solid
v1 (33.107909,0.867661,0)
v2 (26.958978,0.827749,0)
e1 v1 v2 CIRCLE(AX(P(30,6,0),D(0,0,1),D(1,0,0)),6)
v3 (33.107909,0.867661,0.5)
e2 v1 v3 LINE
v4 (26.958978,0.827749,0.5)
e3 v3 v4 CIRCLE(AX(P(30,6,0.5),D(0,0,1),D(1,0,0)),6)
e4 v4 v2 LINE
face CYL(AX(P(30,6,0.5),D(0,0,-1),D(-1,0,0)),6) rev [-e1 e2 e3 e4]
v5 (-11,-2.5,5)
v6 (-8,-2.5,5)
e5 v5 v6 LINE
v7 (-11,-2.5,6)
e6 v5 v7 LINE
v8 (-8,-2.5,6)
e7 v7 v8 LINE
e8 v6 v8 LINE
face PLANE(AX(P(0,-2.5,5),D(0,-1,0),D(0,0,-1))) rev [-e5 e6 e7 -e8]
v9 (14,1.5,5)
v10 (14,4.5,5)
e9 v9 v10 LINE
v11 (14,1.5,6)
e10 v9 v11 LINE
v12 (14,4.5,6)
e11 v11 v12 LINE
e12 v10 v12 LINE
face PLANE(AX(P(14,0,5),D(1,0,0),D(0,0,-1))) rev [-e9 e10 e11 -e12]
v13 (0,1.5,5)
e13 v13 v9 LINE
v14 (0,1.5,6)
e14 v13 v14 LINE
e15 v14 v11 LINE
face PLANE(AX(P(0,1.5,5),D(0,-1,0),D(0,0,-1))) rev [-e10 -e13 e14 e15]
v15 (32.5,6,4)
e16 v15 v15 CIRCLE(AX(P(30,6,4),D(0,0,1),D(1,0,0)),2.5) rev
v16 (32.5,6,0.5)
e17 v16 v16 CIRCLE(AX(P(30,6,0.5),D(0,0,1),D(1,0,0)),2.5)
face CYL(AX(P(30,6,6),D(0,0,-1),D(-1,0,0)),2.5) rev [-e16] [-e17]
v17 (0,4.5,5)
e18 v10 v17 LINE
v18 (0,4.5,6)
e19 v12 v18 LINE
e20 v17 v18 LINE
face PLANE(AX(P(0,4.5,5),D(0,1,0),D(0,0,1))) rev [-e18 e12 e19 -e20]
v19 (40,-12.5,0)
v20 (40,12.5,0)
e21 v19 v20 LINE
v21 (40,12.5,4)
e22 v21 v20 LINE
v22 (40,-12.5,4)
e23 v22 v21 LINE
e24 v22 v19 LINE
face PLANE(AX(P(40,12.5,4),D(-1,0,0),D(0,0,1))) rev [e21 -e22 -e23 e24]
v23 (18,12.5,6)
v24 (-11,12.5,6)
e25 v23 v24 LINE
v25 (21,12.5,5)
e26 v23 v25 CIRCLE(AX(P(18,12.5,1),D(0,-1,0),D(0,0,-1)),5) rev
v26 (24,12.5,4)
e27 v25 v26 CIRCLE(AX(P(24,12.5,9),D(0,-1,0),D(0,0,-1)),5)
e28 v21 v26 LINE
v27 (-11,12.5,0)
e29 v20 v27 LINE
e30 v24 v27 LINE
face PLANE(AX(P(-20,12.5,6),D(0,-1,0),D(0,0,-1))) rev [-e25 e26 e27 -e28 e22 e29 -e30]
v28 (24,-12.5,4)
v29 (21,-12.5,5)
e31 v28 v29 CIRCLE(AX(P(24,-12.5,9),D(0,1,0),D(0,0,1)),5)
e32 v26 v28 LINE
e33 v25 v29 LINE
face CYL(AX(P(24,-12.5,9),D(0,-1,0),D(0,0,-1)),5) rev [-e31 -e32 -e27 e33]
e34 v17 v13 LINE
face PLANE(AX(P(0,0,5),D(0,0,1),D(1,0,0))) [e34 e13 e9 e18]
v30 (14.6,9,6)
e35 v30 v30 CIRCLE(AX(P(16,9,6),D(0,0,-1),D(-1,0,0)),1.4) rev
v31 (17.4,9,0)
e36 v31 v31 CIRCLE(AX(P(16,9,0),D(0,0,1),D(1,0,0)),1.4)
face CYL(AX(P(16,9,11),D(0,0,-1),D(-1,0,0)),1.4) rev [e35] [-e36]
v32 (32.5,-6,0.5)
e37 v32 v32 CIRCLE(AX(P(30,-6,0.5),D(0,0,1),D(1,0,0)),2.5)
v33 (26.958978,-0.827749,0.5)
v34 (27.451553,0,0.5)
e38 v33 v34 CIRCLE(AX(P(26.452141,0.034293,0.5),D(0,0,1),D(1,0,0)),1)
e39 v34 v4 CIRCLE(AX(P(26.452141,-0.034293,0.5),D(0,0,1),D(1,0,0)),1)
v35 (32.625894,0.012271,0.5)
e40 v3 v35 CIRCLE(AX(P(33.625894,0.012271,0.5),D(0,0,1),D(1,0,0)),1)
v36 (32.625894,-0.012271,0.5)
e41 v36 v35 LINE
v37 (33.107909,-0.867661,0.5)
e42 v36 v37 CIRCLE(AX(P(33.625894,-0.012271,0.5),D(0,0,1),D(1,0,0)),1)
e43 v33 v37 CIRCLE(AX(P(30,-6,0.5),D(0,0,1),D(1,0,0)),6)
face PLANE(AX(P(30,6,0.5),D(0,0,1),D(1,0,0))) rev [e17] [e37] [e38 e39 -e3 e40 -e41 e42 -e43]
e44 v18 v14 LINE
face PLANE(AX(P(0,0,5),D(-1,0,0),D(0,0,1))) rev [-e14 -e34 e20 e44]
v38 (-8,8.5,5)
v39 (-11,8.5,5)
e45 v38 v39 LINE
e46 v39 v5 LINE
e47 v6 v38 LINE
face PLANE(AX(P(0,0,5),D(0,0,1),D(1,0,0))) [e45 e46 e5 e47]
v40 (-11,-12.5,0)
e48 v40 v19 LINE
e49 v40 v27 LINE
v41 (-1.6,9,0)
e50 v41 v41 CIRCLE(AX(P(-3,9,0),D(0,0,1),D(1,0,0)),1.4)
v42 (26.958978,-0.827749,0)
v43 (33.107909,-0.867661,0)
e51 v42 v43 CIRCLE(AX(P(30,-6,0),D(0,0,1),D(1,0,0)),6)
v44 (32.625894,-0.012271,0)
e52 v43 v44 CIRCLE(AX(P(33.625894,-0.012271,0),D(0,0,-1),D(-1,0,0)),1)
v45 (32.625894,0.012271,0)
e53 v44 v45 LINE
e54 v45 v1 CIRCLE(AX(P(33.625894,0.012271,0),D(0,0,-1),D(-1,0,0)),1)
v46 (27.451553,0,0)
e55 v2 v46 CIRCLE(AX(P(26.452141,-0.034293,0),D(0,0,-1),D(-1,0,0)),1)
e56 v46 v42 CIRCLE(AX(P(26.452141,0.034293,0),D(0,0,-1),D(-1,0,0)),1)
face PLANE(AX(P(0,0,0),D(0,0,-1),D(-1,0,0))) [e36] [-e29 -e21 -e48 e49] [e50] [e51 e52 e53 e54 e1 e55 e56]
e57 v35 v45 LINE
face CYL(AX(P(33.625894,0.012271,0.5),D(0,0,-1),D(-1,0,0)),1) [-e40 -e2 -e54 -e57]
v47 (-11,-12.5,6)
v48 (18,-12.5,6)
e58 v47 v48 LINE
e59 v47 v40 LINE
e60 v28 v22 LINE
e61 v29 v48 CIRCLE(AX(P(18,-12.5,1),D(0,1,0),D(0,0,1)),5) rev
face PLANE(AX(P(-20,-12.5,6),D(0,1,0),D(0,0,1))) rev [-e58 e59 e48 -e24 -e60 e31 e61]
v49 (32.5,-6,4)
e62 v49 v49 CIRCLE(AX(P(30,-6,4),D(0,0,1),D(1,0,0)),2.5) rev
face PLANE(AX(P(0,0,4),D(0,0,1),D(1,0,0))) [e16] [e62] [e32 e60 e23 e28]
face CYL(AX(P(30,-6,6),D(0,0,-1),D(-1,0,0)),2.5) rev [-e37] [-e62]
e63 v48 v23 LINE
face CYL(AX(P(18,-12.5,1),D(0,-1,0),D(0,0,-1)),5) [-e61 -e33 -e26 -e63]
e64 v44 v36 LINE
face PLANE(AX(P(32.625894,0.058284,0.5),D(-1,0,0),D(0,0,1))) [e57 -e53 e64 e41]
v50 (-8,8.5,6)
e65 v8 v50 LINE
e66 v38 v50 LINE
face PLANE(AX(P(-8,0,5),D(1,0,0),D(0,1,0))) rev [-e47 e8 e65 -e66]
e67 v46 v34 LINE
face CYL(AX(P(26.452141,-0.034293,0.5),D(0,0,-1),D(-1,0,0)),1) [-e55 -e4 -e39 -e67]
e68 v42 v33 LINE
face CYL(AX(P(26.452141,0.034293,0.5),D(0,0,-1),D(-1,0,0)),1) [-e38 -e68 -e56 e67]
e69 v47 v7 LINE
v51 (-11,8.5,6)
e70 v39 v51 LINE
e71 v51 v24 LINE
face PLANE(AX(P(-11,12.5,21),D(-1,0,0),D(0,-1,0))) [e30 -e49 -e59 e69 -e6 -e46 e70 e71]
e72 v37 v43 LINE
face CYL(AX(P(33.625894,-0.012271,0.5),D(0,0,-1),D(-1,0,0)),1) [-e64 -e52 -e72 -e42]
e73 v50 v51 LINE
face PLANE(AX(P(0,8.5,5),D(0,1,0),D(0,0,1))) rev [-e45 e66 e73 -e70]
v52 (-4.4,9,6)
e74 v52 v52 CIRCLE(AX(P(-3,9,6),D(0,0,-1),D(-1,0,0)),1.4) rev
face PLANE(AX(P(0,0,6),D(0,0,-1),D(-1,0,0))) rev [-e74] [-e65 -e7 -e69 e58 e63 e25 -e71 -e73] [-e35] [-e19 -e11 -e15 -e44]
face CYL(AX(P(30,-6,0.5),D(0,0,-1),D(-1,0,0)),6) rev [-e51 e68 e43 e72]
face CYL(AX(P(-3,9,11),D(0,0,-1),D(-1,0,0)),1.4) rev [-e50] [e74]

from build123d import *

# Parameters (mm, degrees)
SKETCH1_W           = 40
SKETCH1_H           = 25
BOSS_EXTRUDE1_DEPTH = 6
CUT_EXTRUDE1_START  = 6
SKETCH3_W           = 14
SKETCH3_H           = 3
SKETCH3_W_2         = 3
SKETCH3_H_2         = 11
CUT_EXTRUDE1_DEPTH  = 1
SKETCH4_R           = 1.4
CUT_EXTRUDE2_DEPTH  = 11
SKETCH7_W           = 9
SKETCH7_H           = 25
CUT_EXTRUDE5_DEPTH  = 21
SKETCH8_W           = 20
SKETCH8_H           = 25
BOSS_EXTRUDE2_DEPTH = 4
SKETCH9_R           = 2.5
CUT_EXTRUDE6_DEPTH  = 43.334973721
CUT_EXTRUDE7_DEPTH  = 0.5
FILLET3_R           = 1
FILLET4_R           = 5
FILLET5_R           = 5


with BuildPart() as part:
    # Sketch1 → Boss-Extrude1 (new body)
    with BuildSketch(Plane.XY):
        Rectangle(SKETCH1_W, SKETCH1_H)
    extrude(amount=BOSS_EXTRUDE1_DEPTH)

    # Sketch3 → Cut-Extrude1 (cut)
    with BuildSketch(Plane.XY.offset(CUT_EXTRUDE1_START)):
        with Locations((7, 3)):
            Rectangle(SKETCH3_W, SKETCH3_H)
        with Locations((-9.5, 3)):
            Rectangle(SKETCH3_W_2, SKETCH3_H_2)
    extrude(amount=-CUT_EXTRUDE1_DEPTH, mode=Mode.SUBTRACT)

    # Sketch4 → Cut-Extrude2 (cut)
    with BuildSketch(Plane.XY):
        with Locations(Location((16, 9, 0), (0, 0, 180))):
            Circle(SKETCH4_R)
        with Locations(Location((-3, 9, 0), (0, 0, 180))):
            Circle(SKETCH4_R)
    extrude(amount=CUT_EXTRUDE2_DEPTH, mode=Mode.SUBTRACT)

    # Sketch7 → Cut-Extrude5 (cut)
    with BuildSketch(Plane.XY):
        with Locations((-15.5, 0)):
            Rectangle(SKETCH7_W, SKETCH7_H)
    extrude(amount=CUT_EXTRUDE5_DEPTH, mode=Mode.SUBTRACT)

    # Sketch8 → Boss-Extrude2 (add)
    with BuildSketch(Plane.XY):
        with Locations((30, 0)):
            Rectangle(SKETCH8_W, SKETCH8_H)
    extrude(amount=BOSS_EXTRUDE2_DEPTH)

    # Sketch9 → Cut-Extrude6 (cut, through all)
    with BuildSketch(Plane.XY):
        with Locations((30, 6)):
            Circle(SKETCH9_R)
        with Locations(Location((30, -6, 0), (0, 0, 180))):
            Circle(SKETCH9_R)
    extrude(amount=CUT_EXTRUDE6_DEPTH, mode=Mode.SUBTRACT)

    # Sketch10 → Cut-Extrude7 (cut)
    with BuildSketch(Plane.XY):
        with BuildLine():
            Line((27.452141011, -0.567835185), (27.452141011, 0.567835185))
            ThreePointArc((27.452141011, 0.567835185), (29.956756767, 11.999844167), (32.625893719, 0.605124452))
            Line((32.625893719, 0.605124452), (32.625893719, 0.058283872))
            Line((32.625893719, 0.058283872), (32.625893719, -0.605124452))
            ThreePointArc((32.625893719, -0.605124452), (29.956756767, -11.999844167), (27.452141011, -0.567835185))
        make_face()
    extrude(amount=CUT_EXTRUDE7_DEPTH, mode=Mode.SUBTRACT)

    # Fillet3
    # the kernel refuses this fillet: 1 mm, written as the material it takes off along each edge
    with BuildSketch(Plane(origin=(27.452141011, -0.567835185, -1.505321413), x_dir=(-0.8846564558137137, -0.466243450556808, 0), z_dir=(0, 0, 1))) as fillet3_piece_1:
        with BuildLine():
            CenterArc((0.603917956, -0.998920373), FILLET3_R, 92.662646755, 59.546627489)
            Line((-0.2807385, -0.532676923), (0, 0))
            ThreePointArc((0, 0), (0.278731364, -0.006477761), (0.557462728, 0))
        make_face()
    extrude(amount=2.005321413, mode=Mode.SUBTRACT)
    with BuildSketch(Plane(origin=(27.452141011, 0.567835185, -1.505321413), x_dir=(-0.8846564558137143, 0.46624345055680716, 0), z_dir=(0, 0, 1))) as fillet3_piece_2:
        with BuildLine():
            CenterArc((0.603917956, 0.998920373), FILLET3_R, 207.790725756, 59.546627489)
            Line((-0.2807385, 0.532676923), (0, 0))
            ThreePointArc((0, 0), (0.278731364, 0.006477761), (0.557462728, 0))
        make_face()
    extrude(amount=2.005321413, mode=Mode.SUBTRACT)
    with BuildSketch(Plane(origin=(32.625893719, -0.605124452, -1.482132829), x_dir=(0.8781869817379448, -0.4783174940413514, 0), z_dir=(0, 0, 1))) as fillet3_piece_3:
        with BuildLine():
            CenterArc((0.594614958, 0.998953396), FILLET3_R, 208.575572443, 58.80282617)
            Line((-0.283572024, 0.520635902), (0, 0))
            ThreePointArc((0, 0), (0.274437673, 0.006279622), (0.548875345, 0))
        make_face()
    extrude(amount=1.982132829, mode=Mode.SUBTRACT)
    with BuildSketch(Plane(origin=(32.625893719, 0.605124452, -1.482132829), x_dir=(0, -1, 0), z_dir=(0, 0, 1))) as fillet3_piece_4:
        with BuildLine():
            CenterArc((0.592853132, 1), FILLET3_R, 211.19717383, 58.80282617)
            ThreePointArc((-0.26253668, 0.482015183), (-0.125753657, 0.244011245), (0, 0))
            Line((0, 0), (0.592853132, 0))
        make_face()
    extrude(amount=1.982132829, mode=Mode.SUBTRACT)

    # Fillet4
    # the kernel refuses this fillet: 5 mm, written as the material it adds along each edge
    with BuildSketch(Plane(origin=(20, -12.5, 4), x_dir=(0, 0, 1), z_dir=(0, 1, 0))) as fillet4_piece_1:
        with BuildLine():
            CenterArc((5, 4), FILLET4_R, 180, 53.130102354)
            Line((0, 4), (-0.1, 4))
            Line((-0.1, 4), (-0.1, 0))
            Line((-0.1, 0), (0, -0.1))
            ThreePointArc((0, -0.1), (1, -0.1), (1.94, -0.08))
            Line((1.94, -0.08), (2, 0))
        make_face()
    extrude(amount=25)

    # Fillet5
    fillet5_edges = [part.edges().sort_by_distance(p)[0] for p in [
        (20, 0, 6),
    ]]
    fillet(fillet5_edges, radius=FILLET5_R)


solid = part.part
